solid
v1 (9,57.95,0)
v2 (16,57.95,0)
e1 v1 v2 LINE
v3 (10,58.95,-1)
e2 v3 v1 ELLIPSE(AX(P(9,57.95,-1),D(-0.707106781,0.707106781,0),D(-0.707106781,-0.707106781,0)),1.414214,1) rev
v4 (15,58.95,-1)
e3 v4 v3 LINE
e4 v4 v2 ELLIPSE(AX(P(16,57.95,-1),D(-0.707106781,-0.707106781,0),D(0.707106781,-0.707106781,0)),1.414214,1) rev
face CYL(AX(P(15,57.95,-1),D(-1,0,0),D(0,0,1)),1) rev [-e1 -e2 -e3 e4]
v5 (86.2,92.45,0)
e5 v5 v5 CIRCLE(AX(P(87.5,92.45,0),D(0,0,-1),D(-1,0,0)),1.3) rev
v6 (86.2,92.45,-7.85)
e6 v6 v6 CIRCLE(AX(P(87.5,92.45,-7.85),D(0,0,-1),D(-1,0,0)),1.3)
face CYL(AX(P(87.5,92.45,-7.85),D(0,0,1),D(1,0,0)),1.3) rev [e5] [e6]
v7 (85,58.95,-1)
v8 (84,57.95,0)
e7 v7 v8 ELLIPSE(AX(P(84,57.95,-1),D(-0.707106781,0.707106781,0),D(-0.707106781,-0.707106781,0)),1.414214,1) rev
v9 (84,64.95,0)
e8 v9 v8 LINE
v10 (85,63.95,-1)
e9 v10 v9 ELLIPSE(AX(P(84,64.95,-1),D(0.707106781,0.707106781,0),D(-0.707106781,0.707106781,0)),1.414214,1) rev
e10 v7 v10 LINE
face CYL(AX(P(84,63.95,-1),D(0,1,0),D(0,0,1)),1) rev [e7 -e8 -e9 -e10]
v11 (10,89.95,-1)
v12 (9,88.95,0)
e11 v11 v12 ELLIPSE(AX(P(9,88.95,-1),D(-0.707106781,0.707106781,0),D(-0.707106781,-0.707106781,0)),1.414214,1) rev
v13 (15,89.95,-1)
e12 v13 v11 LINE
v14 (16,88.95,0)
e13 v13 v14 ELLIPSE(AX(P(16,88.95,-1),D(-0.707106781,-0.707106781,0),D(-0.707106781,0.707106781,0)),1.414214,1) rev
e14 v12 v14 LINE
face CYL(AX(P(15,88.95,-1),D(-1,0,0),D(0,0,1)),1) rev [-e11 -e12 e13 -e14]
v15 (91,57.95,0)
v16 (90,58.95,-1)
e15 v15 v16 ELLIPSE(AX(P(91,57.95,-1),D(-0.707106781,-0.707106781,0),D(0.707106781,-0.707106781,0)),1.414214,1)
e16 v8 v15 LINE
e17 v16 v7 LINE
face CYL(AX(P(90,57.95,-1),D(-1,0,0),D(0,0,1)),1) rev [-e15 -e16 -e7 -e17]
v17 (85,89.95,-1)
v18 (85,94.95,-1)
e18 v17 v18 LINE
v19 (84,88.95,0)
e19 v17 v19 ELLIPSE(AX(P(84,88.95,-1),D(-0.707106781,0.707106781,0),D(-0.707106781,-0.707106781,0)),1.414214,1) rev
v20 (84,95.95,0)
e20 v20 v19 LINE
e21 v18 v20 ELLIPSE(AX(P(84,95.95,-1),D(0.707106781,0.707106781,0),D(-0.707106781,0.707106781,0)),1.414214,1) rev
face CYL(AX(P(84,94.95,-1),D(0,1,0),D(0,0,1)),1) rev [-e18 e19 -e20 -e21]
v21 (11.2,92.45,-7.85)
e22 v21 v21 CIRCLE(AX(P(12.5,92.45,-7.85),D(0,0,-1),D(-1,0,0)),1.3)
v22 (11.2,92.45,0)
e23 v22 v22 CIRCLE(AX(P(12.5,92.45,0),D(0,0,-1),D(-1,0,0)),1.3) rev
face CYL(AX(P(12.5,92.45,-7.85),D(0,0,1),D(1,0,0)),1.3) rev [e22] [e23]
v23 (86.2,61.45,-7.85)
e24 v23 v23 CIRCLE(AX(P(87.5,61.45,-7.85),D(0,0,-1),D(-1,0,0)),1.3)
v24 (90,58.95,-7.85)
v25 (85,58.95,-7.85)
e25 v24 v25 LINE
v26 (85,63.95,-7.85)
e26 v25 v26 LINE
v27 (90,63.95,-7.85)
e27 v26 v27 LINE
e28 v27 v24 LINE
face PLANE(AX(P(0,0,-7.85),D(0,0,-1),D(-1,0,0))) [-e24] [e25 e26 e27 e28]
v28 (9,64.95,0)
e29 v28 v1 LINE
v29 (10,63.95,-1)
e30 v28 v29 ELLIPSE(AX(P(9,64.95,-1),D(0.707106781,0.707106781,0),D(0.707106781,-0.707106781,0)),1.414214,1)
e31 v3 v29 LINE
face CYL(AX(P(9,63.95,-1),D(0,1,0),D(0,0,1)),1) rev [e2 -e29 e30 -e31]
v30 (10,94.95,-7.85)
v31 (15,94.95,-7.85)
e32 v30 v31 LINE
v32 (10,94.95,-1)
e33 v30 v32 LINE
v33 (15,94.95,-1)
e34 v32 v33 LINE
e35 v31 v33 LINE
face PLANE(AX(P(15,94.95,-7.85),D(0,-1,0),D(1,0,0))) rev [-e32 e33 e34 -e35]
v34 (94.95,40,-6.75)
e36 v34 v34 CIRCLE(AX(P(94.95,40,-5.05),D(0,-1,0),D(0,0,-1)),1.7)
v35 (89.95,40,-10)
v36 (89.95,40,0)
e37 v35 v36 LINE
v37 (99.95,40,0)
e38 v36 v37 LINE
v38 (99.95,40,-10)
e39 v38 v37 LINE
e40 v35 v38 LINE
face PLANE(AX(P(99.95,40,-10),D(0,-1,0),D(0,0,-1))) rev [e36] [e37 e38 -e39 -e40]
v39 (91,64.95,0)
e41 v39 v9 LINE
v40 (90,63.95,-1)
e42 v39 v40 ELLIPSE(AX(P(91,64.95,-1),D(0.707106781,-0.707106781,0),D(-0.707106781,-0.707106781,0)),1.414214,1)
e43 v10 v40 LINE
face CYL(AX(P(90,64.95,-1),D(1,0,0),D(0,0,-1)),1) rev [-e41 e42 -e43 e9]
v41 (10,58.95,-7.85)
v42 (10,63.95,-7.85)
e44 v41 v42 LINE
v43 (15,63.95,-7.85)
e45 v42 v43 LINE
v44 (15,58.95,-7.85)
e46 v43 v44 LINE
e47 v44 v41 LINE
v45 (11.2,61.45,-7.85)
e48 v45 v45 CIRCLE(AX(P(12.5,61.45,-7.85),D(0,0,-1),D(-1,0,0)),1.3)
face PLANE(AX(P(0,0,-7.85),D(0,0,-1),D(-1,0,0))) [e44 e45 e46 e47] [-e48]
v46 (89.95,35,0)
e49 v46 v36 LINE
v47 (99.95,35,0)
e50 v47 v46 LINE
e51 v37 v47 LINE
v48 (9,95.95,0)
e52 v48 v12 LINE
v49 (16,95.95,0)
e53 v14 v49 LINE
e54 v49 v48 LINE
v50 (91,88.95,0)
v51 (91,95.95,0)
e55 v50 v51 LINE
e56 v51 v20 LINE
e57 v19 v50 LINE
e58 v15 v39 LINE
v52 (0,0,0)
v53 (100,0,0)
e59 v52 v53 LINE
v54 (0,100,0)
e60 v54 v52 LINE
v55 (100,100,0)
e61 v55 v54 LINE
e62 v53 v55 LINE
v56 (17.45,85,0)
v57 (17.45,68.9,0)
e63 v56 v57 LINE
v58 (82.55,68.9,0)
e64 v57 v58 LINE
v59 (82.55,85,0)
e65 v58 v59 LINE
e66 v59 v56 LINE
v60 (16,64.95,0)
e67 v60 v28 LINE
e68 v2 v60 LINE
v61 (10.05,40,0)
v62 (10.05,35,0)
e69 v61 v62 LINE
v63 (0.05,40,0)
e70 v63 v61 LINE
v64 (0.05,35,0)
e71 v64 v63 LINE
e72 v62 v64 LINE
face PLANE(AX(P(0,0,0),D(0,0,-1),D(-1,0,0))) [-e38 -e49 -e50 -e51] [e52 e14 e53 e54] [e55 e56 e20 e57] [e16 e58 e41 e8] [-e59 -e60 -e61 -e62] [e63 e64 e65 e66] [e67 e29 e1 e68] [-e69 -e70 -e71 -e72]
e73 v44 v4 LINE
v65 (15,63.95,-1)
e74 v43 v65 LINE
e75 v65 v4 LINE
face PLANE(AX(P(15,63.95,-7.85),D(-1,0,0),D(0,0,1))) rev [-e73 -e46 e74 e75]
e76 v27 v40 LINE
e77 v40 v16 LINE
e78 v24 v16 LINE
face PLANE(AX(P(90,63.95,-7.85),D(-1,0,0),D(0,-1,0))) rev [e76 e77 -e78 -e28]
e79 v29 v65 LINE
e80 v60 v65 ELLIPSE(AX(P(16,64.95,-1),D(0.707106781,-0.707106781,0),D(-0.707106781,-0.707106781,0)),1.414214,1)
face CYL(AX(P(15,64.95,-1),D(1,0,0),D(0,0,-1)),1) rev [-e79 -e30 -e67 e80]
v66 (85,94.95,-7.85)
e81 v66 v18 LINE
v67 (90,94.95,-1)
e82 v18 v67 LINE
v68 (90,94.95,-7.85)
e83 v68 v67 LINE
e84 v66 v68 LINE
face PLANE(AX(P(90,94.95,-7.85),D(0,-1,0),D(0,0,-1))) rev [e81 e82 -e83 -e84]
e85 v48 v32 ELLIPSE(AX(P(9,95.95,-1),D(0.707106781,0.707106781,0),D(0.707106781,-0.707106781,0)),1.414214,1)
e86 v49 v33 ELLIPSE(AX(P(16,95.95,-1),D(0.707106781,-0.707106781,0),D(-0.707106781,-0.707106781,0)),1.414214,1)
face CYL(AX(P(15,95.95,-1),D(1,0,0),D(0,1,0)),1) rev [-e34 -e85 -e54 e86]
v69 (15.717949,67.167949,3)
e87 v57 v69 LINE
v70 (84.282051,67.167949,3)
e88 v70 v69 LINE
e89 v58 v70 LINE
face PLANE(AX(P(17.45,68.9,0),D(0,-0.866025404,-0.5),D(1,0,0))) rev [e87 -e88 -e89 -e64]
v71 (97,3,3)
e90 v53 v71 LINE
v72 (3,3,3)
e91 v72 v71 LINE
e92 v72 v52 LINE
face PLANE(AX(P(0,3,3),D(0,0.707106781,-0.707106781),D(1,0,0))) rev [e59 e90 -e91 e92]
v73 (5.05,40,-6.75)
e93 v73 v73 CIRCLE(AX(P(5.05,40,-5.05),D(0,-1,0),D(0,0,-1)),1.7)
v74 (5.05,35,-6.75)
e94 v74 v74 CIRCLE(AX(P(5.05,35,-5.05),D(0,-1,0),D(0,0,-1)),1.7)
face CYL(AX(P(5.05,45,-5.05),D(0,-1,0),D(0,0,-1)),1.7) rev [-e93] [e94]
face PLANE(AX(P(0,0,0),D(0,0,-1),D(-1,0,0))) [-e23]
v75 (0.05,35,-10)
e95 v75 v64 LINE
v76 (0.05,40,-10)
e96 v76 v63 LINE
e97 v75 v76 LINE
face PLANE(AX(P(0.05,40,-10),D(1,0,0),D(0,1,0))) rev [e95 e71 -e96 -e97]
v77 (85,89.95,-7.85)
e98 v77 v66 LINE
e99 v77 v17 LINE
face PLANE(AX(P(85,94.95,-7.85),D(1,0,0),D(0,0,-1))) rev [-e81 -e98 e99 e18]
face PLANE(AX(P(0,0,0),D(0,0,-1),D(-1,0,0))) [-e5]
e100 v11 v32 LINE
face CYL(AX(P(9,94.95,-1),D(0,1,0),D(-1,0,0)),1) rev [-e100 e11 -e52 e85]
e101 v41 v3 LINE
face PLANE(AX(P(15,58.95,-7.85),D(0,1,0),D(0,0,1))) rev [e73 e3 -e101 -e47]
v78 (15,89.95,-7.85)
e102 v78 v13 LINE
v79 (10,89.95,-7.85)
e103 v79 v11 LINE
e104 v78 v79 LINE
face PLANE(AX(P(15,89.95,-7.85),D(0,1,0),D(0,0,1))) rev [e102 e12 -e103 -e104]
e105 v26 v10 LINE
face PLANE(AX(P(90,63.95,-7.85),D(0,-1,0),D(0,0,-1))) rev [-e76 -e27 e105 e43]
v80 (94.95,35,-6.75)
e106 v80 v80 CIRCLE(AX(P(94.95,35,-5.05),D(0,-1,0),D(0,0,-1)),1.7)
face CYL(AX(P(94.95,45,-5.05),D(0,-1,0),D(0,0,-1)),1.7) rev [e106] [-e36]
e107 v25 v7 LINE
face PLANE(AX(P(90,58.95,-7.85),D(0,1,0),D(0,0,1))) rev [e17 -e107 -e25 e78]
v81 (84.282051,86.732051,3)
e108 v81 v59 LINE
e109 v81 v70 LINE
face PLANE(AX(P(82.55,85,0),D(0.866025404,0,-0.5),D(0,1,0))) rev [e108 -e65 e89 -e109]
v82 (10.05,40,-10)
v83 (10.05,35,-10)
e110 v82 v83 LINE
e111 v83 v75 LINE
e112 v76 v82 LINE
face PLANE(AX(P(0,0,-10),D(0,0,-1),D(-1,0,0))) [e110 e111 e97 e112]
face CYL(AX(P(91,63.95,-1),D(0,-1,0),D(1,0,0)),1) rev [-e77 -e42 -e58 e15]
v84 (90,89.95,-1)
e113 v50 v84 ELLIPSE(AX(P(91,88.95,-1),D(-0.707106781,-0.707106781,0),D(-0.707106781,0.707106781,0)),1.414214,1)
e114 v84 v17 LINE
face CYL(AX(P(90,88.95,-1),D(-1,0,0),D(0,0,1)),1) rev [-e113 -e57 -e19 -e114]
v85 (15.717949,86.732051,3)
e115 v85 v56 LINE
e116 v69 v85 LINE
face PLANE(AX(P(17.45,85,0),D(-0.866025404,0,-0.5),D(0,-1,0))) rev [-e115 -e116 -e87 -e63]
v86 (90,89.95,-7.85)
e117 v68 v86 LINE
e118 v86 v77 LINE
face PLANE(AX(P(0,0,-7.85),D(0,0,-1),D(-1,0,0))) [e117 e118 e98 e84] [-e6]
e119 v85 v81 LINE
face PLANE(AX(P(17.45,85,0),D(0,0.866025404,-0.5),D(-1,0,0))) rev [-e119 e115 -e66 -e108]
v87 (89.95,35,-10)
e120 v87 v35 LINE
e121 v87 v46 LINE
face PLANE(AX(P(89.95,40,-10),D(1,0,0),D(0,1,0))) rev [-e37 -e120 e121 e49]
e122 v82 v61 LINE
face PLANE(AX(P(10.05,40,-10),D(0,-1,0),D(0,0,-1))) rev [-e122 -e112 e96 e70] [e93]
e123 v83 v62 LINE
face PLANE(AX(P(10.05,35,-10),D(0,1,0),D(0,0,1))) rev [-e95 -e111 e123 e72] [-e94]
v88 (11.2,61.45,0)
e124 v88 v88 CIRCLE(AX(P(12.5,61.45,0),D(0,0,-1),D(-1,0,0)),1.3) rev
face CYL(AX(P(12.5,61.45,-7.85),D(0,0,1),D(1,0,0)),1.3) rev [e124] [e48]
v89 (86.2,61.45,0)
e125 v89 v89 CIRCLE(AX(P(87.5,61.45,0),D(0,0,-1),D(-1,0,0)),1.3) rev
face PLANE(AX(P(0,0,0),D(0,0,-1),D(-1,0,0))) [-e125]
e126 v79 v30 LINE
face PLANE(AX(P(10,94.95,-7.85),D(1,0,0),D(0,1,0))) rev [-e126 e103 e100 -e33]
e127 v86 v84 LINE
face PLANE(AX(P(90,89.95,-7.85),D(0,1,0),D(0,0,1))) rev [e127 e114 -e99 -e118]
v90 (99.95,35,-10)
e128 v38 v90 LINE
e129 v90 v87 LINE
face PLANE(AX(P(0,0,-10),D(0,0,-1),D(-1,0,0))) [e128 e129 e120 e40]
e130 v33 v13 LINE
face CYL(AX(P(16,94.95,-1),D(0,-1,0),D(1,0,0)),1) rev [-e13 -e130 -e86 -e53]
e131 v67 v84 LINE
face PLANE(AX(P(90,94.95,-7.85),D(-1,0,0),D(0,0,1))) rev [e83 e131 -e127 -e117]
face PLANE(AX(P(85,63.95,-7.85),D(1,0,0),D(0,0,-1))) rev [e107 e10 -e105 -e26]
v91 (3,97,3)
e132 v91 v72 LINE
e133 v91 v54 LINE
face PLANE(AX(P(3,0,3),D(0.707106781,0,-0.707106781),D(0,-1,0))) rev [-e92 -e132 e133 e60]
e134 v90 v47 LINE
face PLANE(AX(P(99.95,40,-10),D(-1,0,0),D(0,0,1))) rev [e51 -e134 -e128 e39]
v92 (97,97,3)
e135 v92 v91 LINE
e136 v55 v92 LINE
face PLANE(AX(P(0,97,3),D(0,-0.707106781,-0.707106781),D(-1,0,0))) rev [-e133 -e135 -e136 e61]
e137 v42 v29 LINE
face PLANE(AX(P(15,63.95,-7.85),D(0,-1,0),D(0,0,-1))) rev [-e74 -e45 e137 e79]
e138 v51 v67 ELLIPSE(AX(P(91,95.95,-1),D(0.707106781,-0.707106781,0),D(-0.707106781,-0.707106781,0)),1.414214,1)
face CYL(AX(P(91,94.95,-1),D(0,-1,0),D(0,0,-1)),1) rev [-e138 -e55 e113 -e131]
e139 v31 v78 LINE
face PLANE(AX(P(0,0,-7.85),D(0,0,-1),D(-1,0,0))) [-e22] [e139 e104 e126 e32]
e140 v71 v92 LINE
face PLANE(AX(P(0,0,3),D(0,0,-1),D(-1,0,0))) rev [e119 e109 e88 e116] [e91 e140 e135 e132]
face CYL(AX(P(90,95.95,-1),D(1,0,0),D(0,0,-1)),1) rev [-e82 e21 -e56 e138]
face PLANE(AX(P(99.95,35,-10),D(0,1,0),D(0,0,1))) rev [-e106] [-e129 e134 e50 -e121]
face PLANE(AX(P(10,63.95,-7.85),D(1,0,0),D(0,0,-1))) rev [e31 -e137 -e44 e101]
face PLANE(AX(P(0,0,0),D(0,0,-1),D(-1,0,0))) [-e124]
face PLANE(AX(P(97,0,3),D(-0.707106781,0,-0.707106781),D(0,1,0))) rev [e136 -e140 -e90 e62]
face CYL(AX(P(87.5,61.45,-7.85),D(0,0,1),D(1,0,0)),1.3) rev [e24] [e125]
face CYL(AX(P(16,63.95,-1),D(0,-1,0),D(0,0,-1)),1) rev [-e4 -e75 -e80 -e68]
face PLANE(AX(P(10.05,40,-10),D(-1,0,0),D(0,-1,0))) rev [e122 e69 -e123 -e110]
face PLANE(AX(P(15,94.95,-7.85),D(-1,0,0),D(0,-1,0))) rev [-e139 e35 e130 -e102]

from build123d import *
from OCP.BRepFilletAPI import BRepFilletAPI_MakeChamfer

# Parameters (mm, degrees)
ESQUISSE1_W             = 100
ESQUISSE1_H             = 100
BOSS_EXTRU_1_DEPTH      = 3
ESQUISSE2_W             = 65.1
ESQUISSE2_H             = 16.1
ENL_V_MAT_EXTRU_1_DEPTH = 142.453172464
CHANFREIN1_SIZE         = 3
ESQUISSE3_W             = 5
ESQUISSE3_H             = 5
ESQUISSE3_R             = 1.3
BOSS_EXTRU_2_DEPTH      = 7.85
CHANFREIN2_SIZE         = 1.732050808
CHANFREIN2_SIZE_2       = 3
CONG_1_R                = 1
ESQUISSE4_W             = 10
ESQUISSE4_H             = 5
BOSS_EXTRU_3_DEPTH      = 10
ESQUISSE5_R             = 1.7
ENL_V_MAT_EXTRU_2_DEPTH = 10


with BuildPart() as part:
    # Esquisse1 → Boss.-Extru.1 (new body)
    with BuildSketch(Plane.XY):
        with Locations((50, 50)):
            Rectangle(ESQUISSE1_W, ESQUISSE1_H)
    extrude(amount=BOSS_EXTRU_1_DEPTH)

    # Esquisse2 → Enlèv. mat.-Extru.1 (cut, through all)
    with BuildSketch(Plane.XY.offset(3)):
        with Locations((50, 76.95)):
            Rectangle(ESQUISSE2_W, ESQUISSE2_H)
    extrude(amount=-ENL_V_MAT_EXTRU_1_DEPTH, mode=Mode.SUBTRACT)

    # Chanfrein1
    chanfrein1_edges = [part.edges().sort_by_distance(p)[0] for p in [
        (50, 0, 3),
        (0, 50, 3),
        (50, 100, 3),
        (100, 50, 3),
    ]]
    chamfer(chanfrein1_edges, length=CHANFREIN1_SIZE - 0.0001)  # a hair under: the kernel refuses the full size

    # Esquisse3 → Boss.-Extru.2 (add)
    # profile 1 of 4: a face of its own
    with BuildSketch(Plane(origin=(0, 0, 0), x_dir=(-1, 0, 0), z_dir=(0, 0, -1))):
        with Locations((-87.5, 92.45)):
            Rectangle(ESQUISSE3_W, ESQUISSE3_H)
        with Locations((-87.5, 92.45)):
            Circle(ESQUISSE3_R, mode=Mode.SUBTRACT)
    # profile 2 of 4: a face of its own
    with BuildSketch(Plane(origin=(0, 0, 0), x_dir=(-1, 0, 0), z_dir=(0, 0, -1))):
        with Locations((-12.5, 92.45)):
            Rectangle(ESQUISSE3_W, ESQUISSE3_H)
        with Locations((-12.5, 92.45)):
            Circle(ESQUISSE3_R, mode=Mode.SUBTRACT)
    # profile 3 of 4: a face of its own
    with BuildSketch(Plane(origin=(0, 0, 0), x_dir=(-1, 0, 0), z_dir=(0, 0, -1))):
        with Locations((-87.5, 61.45)):
            Rectangle(ESQUISSE3_W, ESQUISSE3_H)
        with Locations((-87.5, 61.45)):
            Circle(ESQUISSE3_R, mode=Mode.SUBTRACT)
    # profile 4 of 4: a face of its own
    with BuildSketch(Plane(origin=(0, 0, 0), x_dir=(-1, 0, 0), z_dir=(0, 0, -1))):
        with Locations((-12.5, 61.45)):
            Rectangle(ESQUISSE3_W, ESQUISSE3_H)
        with Locations((-12.5, 61.45)):
            Circle(ESQUISSE3_R, mode=Mode.SUBTRACT)
    extrude(amount=BOSS_EXTRU_2_DEPTH)

    # Chanfrein2
    chanfrein2_edges_1 = [part.edges().sort_by_distance(p)[0] for p in [
        (82.55, 76.95, 3),
    ]]
    chanfrein2_side_1 = [part.faces().sort_by_distance(p)[0] for p in [
        (82.584641016, 76.95, 3),
    ]]
    chanfrein2_edges_2 = [part.edges().sort_by_distance(p)[0] for p in [
        (50, 68.9, 3),
    ]]
    chanfrein2_side_2 = [part.faces().sort_by_distance(p)[0] for p in [
        (50, 68.865358984, 3),
    ]]
    chanfrein2_edges_3 = [part.edges().sort_by_distance(p)[0] for p in [
        (17.45, 76.95, 3),
    ]]
    chanfrein2_side_3 = [part.faces().sort_by_distance(p)[0] for p in [
        (17.415358984, 76.95, 3),
    ]]
    chanfrein2_edges_4 = [part.edges().sort_by_distance(p)[0] for p in [
        (50, 85, 3),
    ]]
    chanfrein2_side_4 = [part.faces().sort_by_distance(p)[0] for p in [
        (50, 85.034641016, 3),
    ]]
    chanfrein2 = BRepFilletAPI_MakeChamfer(part.part.solid().wrapped)
    for e in chanfrein2_edges_1:
        chanfrein2.Add(CHANFREIN2_SIZE - 0.0001, CHANFREIN2_SIZE_2 - 0.0001, e.wrapped, chanfrein2_side_1[0].wrapped)
    for e in chanfrein2_edges_2:
        chanfrein2.Add(CHANFREIN2_SIZE - 0.0001, CHANFREIN2_SIZE_2 - 0.0001, e.wrapped, chanfrein2_side_2[0].wrapped)
    for e in chanfrein2_edges_3:
        chanfrein2.Add(CHANFREIN2_SIZE - 0.0001, CHANFREIN2_SIZE_2 - 0.0001, e.wrapped, chanfrein2_side_3[0].wrapped)
    for e in chanfrein2_edges_4:
        chanfrein2.Add(CHANFREIN2_SIZE - 0.0001, CHANFREIN2_SIZE_2 - 0.0001, e.wrapped, chanfrein2_side_4[0].wrapped)
    add(Compound.cast(chanfrein2.Shape()), mode=Mode.REPLACE)  # a hair under: the kernel refuses the full size

    # Congé1
    cong_1_edges = [part.edges().sort_by_distance(p)[0] for p in [
        (90, 92.45, 0),
        (87.5, 89.95, 0),
        (85, 92.45, 0),
        (87.5, 94.95, 0),
        (15, 92.45, 0),
        (12.5, 89.95, 0),
        (10, 92.45, 0),
        (12.5, 94.95, 0),
        (90, 61.45, 0),
        (87.5, 58.95, 0),
        (85, 61.45, 0),
        (87.5, 63.95, 0),
        (15, 61.45, 0),
        (12.5, 58.95, 0),
        (10, 61.45, 0),
        (12.5, 63.95, 0),
    ]]
    fillet(cong_1_edges, radius=CONG_1_R)

    # Esquisse4 → Boss.-Extru.3 (add)
    with BuildSketch(Plane(origin=(0, 0, 0), x_dir=(-1, 0, 0), z_dir=(0, 0, -1))):
        with Locations((-94.95, 37.5)):
            Rectangle(ESQUISSE4_W, ESQUISSE4_H)
        with Locations((-5.05, 37.5)):
            Rectangle(ESQUISSE4_W, ESQUISSE4_H)
    extrude(amount=BOSS_EXTRU_3_DEPTH)

    # Esquisse5 → Enlèv. mat.-Extru.2 (cut)
    with BuildSketch(Plane.XZ.offset(-35)):
        with Locations(Location((94.95, -5.05, 0), (0, 0, 270))):
            Circle(ESQUISSE5_R)
        with Locations(Location((5.05, -5.05, 0), (0, 0, 270))):
            Circle(ESQUISSE5_R)
    extrude(amount=-ENL_V_MAT_EXTRU_2_DEPTH, mode=Mode.SUBTRACT)


solid = part.part
